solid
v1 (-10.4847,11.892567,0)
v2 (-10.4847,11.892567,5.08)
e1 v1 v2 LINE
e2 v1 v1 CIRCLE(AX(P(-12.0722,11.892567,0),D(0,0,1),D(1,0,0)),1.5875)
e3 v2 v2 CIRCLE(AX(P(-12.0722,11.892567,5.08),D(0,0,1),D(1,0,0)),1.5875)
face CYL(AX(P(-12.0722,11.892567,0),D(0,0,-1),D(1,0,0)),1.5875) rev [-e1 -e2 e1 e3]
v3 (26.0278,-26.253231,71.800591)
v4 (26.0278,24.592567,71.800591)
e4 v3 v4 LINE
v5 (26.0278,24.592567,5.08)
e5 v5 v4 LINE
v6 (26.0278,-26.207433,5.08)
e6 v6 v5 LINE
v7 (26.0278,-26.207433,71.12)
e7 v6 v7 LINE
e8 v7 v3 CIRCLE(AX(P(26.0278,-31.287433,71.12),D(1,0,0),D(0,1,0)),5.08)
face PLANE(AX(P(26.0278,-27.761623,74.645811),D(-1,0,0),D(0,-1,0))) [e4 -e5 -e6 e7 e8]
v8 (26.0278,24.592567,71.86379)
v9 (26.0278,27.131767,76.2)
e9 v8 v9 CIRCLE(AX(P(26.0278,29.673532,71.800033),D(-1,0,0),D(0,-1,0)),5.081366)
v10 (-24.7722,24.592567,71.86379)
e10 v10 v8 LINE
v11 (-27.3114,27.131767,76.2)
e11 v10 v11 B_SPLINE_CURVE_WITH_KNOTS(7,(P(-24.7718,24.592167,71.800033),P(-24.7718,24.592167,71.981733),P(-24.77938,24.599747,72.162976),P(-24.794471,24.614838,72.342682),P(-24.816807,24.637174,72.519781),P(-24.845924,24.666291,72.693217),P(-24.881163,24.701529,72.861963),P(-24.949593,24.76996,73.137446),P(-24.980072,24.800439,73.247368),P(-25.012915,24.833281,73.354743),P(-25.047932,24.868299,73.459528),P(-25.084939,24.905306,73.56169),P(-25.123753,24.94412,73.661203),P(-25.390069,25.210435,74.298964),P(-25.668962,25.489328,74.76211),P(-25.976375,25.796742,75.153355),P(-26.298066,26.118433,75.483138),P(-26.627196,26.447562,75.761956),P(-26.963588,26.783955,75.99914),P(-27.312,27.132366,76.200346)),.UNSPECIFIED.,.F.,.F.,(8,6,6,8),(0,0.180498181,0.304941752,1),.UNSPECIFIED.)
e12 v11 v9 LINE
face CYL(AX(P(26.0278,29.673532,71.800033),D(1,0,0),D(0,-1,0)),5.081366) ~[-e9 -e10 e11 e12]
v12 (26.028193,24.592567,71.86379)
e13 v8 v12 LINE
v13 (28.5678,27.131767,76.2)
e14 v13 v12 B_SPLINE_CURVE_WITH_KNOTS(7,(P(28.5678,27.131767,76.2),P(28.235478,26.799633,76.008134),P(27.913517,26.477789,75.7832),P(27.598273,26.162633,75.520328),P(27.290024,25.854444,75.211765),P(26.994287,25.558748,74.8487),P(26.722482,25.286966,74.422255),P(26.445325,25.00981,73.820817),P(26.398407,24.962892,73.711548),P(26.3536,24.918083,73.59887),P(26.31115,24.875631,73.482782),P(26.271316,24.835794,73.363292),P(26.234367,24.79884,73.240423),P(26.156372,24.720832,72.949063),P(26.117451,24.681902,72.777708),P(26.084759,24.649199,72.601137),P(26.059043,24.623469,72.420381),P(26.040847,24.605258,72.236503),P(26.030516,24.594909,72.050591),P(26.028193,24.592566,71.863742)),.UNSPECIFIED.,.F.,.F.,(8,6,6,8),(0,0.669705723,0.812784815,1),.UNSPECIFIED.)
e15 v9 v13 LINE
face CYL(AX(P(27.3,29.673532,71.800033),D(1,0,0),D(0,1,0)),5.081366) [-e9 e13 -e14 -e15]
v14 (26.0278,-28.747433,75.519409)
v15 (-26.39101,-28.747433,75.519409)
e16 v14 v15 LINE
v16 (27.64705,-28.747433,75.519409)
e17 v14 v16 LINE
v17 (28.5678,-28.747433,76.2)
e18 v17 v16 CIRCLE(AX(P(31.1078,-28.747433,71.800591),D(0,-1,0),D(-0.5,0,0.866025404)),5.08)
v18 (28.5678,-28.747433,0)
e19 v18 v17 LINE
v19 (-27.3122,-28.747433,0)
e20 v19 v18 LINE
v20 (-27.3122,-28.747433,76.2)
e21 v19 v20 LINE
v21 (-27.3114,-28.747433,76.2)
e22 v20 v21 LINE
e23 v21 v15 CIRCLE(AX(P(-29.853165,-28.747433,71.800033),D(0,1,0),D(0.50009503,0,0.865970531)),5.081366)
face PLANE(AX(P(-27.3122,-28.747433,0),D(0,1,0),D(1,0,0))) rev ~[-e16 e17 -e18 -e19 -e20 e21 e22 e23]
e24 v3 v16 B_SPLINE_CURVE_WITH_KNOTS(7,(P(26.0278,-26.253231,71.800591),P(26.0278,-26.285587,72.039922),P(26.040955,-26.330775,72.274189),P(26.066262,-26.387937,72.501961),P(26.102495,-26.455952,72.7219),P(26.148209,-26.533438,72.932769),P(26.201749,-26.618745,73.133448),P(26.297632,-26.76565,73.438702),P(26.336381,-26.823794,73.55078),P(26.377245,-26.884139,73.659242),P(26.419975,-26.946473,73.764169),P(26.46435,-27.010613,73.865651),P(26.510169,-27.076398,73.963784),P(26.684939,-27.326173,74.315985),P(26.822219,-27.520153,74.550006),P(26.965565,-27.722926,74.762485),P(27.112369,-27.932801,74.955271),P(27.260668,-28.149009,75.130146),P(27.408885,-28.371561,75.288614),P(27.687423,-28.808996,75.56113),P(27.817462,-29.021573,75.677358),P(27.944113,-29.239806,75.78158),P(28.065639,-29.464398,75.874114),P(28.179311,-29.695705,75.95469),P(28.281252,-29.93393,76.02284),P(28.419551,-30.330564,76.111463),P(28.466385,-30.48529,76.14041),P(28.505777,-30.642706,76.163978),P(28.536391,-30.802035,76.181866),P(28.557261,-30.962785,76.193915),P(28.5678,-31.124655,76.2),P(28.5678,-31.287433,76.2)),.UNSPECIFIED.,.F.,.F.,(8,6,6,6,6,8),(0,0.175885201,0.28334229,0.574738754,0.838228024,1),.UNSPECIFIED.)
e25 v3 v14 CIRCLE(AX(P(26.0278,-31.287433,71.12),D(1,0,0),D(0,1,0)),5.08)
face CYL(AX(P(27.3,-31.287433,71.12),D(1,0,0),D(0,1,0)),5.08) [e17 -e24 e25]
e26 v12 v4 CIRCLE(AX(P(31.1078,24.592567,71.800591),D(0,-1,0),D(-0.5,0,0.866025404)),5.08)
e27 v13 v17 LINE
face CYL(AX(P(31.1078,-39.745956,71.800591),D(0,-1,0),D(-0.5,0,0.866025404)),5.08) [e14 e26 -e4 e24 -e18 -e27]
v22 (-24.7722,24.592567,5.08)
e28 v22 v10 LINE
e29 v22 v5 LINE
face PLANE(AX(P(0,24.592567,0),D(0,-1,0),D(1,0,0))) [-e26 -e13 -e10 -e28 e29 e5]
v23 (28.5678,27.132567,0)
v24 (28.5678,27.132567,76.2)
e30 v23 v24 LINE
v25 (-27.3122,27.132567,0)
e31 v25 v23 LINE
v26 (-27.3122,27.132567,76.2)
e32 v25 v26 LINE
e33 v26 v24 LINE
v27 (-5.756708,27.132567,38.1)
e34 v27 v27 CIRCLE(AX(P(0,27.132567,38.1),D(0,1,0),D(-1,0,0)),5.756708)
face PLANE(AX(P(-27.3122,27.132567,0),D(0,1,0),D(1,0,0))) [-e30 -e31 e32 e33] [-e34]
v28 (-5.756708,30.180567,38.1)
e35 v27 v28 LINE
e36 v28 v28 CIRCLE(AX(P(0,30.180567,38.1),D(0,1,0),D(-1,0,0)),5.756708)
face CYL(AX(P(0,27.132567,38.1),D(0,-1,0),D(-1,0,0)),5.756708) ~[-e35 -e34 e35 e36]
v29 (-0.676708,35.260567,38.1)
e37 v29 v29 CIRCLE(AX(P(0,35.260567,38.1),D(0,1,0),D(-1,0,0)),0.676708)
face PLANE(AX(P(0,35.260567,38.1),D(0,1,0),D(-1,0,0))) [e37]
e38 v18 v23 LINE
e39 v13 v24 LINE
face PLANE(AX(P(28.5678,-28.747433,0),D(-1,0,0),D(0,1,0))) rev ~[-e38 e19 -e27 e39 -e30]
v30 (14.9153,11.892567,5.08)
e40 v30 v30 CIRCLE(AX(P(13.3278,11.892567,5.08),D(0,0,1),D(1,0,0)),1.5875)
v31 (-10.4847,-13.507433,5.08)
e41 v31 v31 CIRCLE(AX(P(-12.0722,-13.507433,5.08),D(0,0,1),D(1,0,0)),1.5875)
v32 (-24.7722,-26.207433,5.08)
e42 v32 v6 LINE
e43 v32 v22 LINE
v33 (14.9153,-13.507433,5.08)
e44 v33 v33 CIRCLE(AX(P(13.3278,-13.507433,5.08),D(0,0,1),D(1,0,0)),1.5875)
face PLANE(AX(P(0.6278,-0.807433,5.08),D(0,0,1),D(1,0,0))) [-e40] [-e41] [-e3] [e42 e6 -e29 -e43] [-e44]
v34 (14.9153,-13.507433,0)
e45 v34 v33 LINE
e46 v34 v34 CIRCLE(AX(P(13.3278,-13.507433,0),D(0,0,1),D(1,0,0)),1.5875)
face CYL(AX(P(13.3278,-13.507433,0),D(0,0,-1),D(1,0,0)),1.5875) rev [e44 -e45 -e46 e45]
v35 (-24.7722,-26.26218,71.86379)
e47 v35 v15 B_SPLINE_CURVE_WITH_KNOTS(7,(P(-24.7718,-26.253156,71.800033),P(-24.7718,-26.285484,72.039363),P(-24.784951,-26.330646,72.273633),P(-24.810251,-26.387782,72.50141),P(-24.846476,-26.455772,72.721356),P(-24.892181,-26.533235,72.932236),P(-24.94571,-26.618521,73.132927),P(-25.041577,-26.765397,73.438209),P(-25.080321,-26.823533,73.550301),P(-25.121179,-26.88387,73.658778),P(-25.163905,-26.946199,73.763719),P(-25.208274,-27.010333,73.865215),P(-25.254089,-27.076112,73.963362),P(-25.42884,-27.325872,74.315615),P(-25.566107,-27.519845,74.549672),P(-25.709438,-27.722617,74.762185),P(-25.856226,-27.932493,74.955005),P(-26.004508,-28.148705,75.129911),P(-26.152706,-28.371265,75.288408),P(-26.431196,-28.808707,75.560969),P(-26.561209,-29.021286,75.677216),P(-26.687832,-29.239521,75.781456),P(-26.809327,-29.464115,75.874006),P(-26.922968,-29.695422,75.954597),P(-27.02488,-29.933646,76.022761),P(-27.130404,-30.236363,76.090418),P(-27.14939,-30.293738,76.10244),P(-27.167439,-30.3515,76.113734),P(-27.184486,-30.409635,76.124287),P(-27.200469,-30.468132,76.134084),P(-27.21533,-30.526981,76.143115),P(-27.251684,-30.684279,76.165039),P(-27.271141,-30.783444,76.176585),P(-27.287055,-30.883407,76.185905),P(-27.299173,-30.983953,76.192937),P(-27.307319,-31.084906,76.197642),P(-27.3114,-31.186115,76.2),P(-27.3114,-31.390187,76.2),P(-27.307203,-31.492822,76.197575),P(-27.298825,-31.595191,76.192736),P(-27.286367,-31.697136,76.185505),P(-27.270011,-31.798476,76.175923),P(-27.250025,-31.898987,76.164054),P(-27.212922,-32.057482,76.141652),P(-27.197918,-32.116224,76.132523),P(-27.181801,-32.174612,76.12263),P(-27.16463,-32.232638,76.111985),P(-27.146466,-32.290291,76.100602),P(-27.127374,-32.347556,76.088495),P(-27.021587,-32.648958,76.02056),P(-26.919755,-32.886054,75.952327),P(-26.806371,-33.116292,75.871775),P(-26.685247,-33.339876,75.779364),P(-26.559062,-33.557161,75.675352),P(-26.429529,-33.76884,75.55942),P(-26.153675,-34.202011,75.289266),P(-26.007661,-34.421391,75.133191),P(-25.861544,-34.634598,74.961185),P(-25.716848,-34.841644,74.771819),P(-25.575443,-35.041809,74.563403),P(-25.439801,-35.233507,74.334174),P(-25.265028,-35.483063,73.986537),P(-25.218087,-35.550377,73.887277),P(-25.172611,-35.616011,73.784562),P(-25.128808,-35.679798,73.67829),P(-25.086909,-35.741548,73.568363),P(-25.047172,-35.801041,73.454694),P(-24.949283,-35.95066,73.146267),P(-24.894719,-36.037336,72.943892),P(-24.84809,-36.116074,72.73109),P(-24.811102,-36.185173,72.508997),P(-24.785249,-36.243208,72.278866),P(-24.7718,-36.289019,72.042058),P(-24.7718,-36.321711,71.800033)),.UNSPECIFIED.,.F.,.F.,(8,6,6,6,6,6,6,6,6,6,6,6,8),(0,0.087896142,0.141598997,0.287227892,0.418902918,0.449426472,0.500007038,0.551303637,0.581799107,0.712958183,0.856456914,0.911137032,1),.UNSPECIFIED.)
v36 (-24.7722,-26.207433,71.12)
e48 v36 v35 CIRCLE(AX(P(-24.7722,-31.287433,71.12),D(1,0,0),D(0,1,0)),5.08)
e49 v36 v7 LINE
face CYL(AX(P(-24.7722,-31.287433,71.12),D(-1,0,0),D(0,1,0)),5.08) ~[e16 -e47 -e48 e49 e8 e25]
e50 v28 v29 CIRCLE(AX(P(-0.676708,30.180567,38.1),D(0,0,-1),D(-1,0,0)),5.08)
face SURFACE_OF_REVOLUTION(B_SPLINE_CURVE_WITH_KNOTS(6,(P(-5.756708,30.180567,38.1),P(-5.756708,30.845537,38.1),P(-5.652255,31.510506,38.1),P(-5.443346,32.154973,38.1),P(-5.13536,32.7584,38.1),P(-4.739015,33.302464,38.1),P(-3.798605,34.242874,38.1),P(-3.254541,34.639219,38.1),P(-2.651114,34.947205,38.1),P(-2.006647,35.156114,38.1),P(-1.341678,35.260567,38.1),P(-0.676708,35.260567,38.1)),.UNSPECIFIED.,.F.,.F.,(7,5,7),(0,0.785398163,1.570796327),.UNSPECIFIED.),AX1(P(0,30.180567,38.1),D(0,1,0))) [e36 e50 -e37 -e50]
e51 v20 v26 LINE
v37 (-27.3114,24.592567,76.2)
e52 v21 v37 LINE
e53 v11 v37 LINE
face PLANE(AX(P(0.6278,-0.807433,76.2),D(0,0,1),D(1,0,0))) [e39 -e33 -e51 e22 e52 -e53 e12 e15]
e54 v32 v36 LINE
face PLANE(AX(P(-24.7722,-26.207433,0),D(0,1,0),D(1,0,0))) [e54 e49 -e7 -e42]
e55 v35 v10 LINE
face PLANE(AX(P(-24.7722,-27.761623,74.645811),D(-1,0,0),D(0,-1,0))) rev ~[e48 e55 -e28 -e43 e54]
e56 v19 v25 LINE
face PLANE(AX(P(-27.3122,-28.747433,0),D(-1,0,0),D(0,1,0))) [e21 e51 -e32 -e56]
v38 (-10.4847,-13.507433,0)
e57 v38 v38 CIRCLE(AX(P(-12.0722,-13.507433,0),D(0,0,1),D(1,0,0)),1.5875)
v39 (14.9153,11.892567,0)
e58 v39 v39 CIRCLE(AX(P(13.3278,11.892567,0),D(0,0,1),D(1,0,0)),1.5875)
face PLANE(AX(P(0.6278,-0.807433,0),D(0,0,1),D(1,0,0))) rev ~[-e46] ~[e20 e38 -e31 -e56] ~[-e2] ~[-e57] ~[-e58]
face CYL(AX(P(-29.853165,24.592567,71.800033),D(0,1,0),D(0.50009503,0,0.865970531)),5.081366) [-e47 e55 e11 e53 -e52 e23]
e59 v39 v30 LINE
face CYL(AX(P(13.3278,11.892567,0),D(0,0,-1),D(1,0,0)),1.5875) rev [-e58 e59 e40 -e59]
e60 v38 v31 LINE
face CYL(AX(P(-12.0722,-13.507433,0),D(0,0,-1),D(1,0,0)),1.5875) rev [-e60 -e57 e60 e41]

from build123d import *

# Parameters (mm, degrees)
F0_W         = 50.8
F0_H         = 50.8
F0_R         = 1.5875
F1_DEPTH     = 5.08
F0_W_2       = 55.88
F0_H_2       = 55.88
F2_DEPTH     = 76.2
F3_T1_DEPTH  = 50.8
F4_T4_DEPTH  = 64.3399164321
F4_S5_R      = 5.0800000001
F4_T6_DEPTH  = 34
F5_T4_DEPTH  = 64.3391166785
F5_S5_R      = 5.0813656856
F5_T6_DEPTH  = 34
F6_T4_DEPTH  = 77.8762455026
F6_S6_R      = 5.0800000001
F6_T7_DEPTH  = 41
F6_T11_DEPTH = 77.8762455026
F6_S13_R     = 5.081365685
F6_T14_DEPTH = 41
F7_R         = 5.7567075364
F8_DEPTH     = 8.128
F9_R         = 5.08


# Not quite as in the source:
# - a fillet or chamfer that OpenCascade refuses, or shapes differently, is made with other operations: its cross-section is extruded or revolved along the edge and cut away or added


with BuildPart() as f1:
    # F0 (on Top) → F1 (new body)
    with BuildSketch(Plane.XY):
        with Locations((0.627800245, -0.8074334759)):
            Rectangle(F0_W, F0_H)
        with Locations((-12.072199755, -13.5074334759)):
            Circle(F0_R, mode=Mode.SUBTRACT)
        with Locations((13.327800245, -13.5074334759)):
            Circle(F0_R, mode=Mode.SUBTRACT)
        with Locations((-12.072199755, 11.8925665241)):
            Circle(F0_R, mode=Mode.SUBTRACT)
        with Locations((13.327800245, 11.8925665241)):
            Circle(F0_R, mode=Mode.SUBTRACT)
    extrude(amount=F1_DEPTH)

    # F0 (on Top) → F2 (join)
    with BuildSketch(Plane.XY):
        with Locations((0.627800245, -0.8074334759)):
            Rectangle(F0_W_2, F0_H_2)
        with Locations((0.627800245, -0.8074334759)):
            Rectangle(F0_W, F0_H, mode=Mode.SUBTRACT)
    extrude(amount=F2_DEPTH)

    # F3: fillet of radius 5.08 on 1 edges, made by hand

    # F3_s2 → F3_t1 (cut)
    with BuildSketch(Plane.YZ.offset(-24.772199755)):
        with BuildLine():
            ThreePointArc((-26.2074334759, 71.12), (-27.6953310275, 74.7121024484), (-31.2874334759, 76.2))
            Line((-31.2874334759, 76.2), (-26.2074334759, 76.2))
            Line((-26.2074334759, 76.2), (-26.2074334759, 71.12))
        make_face()
    extrude(amount=F3_T1_DEPTH, mode=Mode.SUBTRACT)

    # F4: fillet of radius 5.08 on 1 edges, made by hand


with BuildPart() as f4_tool2:
    # F4_s3 → F4_t4 (new body)
    with BuildSketch(Plane.XZ.offset(-24.5925665241)):
        with BuildLine():
            ThreePointArc((-27.311999717, 76.2003463882), (-25.4524342775, 74.3404748362), (-24.771799755, 71.8000334454))
            Line((-24.771799755, 71.8000334454), (-24.2636631865, 71.8000334454))
            ThreePointArc((-24.2636631865, 71.8000334454), (-24.2640631865, 74.0000167227), (-24.2640631865, 76.2))
            Line((-24.2640631865, 76.2), (-24.772199755, 76.7081365685))
            ThreePointArc((-24.772199755, 76.7081365685), (-26.042099736, 76.7081365685), (-27.0578831447, 76.6403776825))
            Line((-27.0578831447, 76.6403776825), (-27.311999717, 76.2003463882))
        make_face()
    extrude(amount=F4_T4_DEPTH)

    # F4_s5 → F4_t6 (cut, symmetric)
    with BuildSketch(Plane.YZ.offset(-25.8)):
        with Locations((-31.287433476, 71.1199999999)):
            Circle(F4_S5_R)
    extrude(amount=F4_T6_DEPTH, both=True, mode=Mode.SUBTRACT)


with BuildPart() as f1_1:
    add(f1.part)

    # F4_t1: cut F4_tool2
    add(f4_tool2.part, mode=Mode.SUBTRACT)

    # F5: fillet of radius 5.08 on 1 edges, made by hand


with BuildPart() as f5_tool2:
    # F5_s3 → F5_t4 (new body)
    with BuildSketch(Plane.YZ.offset(26.027800245)):
        with BuildLine():
            ThreePointArc((24.5921665241, 71.8000334454), (25.2728010465, 74.3404748362), (27.1323664861, 76.2003463882))
            Line((27.1323664861, 76.2003463882), (26.8782499137, 76.6403776825))
            ThreePointArc((26.8782499137, 76.6403776825), (25.8624665051, 76.7081365685), (24.5925665241, 76.7081365685))
            Line((24.5925665241, 76.7081365685), (24.0844299555, 76.2))
            ThreePointArc((24.0844299555, 76.2), (24.0844299555, 74.0000167227), (24.0840299555, 71.8000334454))
            Line((24.0840299555, 71.8000334454), (24.5921665241, 71.8000334454))
        make_face()
    extrude(amount=-F5_T4_DEPTH)

    # F5_s5 → F5_t6 (cut, symmetric)
    with BuildSketch(Plane.XZ.offset(-25.6)):
        with Locations((-29.8531654406, 71.8000334452)):
            Circle(F5_S5_R)
    extrude(amount=F5_T6_DEPTH, both=True, mode=Mode.SUBTRACT)


with BuildPart() as f1_2:
    add(f1_1.part)

    # F5_t1: cut F5_tool2
    add(f5_tool2.part, mode=Mode.SUBTRACT)

    # F6: fillet of radius 5.08 on 1 edges, made by hand


with BuildPart() as f6_tool2:
    # F6_s3 → F6_t4 (new body)
    with BuildSketch(Plane.XZ.offset(39.745956104)):
        with BuildLine():
            ThreePointArc((28.567800245, 76.2), (26.7083911938, 74.3405909488), (26.027800245, 71.8005909488))
            Line((26.027800245, 71.8005909488), (26.027800245, 76.2))
            Line((26.027800245, 76.2), (28.567800245, 76.2))
        make_face()
    extrude(amount=-F6_T4_DEPTH)

    split(bisect_by=Plane.XZ.offset(-24.5925665241), keep=Keep.TOP)

    # F6_s6 → F6_t7 (cut, symmetric)
    with BuildSketch(Plane.YZ.offset(27.3)):
        with Locations((-31.287433476, 71.1199999999)):
            Circle(F6_S6_R)
    extrude(amount=F6_T7_DEPTH, both=True, mode=Mode.SUBTRACT)


with BuildPart() as f1_3:
    add(f1_2.part)

    # F6_t1: cut F6_tool2
    add(f6_tool2.part, mode=Mode.SUBTRACT)


with BuildPart() as f6_tool9:
    # F6_s10 → F6_t11 (new body)
    with BuildSketch(Plane.XZ.offset(39.745956104)):
        with BuildLine():
            ThreePointArc((28.567800245, 76.2), (26.7083911938, 74.3405909488), (26.027800245, 71.8005909488))
            Line((26.027800245, 71.8005909488), (26.027800245, 76.2))
            Line((26.027800245, 76.2), (28.567800245, 76.2))
        make_face()
    extrude(amount=-F6_T11_DEPTH)

    split(bisect_by=Plane.XZ.offset(-24.5925665241), keep=Keep.BOTTOM)

    # F6_s13 → F6_t14 (cut, symmetric)
    with BuildSketch(Plane.YZ.offset(27.3)):
        with Locations((29.6735322091, 71.8000334456)):
            Circle(F6_S13_R)
    extrude(amount=F6_T14_DEPTH, both=True, mode=Mode.SUBTRACT)


with BuildPart() as f1_4:
    add(f1_3.part)

    # F6_t8: cut F6_tool9
    add(f6_tool9.part, mode=Mode.SUBTRACT)

    # F7 (on face) → F8 (join)
    with BuildSketch(Plane(origin=(0, 27.1325665241, 0), x_dir=(-1, 0, 0), z_dir=(0, 1, 0))):
        with Locations((0, 38.1)):
            Circle(F7_R)
    extrude(amount=F8_DEPTH)

    # F9
    f9_edges = [f1_4.edges().sort_by_distance(p)[0] for p in [
        (5.756708, 35.260567, 38.1),
    ]]
    fillet(f9_edges, radius=F9_R)


solid = f1_4.part
